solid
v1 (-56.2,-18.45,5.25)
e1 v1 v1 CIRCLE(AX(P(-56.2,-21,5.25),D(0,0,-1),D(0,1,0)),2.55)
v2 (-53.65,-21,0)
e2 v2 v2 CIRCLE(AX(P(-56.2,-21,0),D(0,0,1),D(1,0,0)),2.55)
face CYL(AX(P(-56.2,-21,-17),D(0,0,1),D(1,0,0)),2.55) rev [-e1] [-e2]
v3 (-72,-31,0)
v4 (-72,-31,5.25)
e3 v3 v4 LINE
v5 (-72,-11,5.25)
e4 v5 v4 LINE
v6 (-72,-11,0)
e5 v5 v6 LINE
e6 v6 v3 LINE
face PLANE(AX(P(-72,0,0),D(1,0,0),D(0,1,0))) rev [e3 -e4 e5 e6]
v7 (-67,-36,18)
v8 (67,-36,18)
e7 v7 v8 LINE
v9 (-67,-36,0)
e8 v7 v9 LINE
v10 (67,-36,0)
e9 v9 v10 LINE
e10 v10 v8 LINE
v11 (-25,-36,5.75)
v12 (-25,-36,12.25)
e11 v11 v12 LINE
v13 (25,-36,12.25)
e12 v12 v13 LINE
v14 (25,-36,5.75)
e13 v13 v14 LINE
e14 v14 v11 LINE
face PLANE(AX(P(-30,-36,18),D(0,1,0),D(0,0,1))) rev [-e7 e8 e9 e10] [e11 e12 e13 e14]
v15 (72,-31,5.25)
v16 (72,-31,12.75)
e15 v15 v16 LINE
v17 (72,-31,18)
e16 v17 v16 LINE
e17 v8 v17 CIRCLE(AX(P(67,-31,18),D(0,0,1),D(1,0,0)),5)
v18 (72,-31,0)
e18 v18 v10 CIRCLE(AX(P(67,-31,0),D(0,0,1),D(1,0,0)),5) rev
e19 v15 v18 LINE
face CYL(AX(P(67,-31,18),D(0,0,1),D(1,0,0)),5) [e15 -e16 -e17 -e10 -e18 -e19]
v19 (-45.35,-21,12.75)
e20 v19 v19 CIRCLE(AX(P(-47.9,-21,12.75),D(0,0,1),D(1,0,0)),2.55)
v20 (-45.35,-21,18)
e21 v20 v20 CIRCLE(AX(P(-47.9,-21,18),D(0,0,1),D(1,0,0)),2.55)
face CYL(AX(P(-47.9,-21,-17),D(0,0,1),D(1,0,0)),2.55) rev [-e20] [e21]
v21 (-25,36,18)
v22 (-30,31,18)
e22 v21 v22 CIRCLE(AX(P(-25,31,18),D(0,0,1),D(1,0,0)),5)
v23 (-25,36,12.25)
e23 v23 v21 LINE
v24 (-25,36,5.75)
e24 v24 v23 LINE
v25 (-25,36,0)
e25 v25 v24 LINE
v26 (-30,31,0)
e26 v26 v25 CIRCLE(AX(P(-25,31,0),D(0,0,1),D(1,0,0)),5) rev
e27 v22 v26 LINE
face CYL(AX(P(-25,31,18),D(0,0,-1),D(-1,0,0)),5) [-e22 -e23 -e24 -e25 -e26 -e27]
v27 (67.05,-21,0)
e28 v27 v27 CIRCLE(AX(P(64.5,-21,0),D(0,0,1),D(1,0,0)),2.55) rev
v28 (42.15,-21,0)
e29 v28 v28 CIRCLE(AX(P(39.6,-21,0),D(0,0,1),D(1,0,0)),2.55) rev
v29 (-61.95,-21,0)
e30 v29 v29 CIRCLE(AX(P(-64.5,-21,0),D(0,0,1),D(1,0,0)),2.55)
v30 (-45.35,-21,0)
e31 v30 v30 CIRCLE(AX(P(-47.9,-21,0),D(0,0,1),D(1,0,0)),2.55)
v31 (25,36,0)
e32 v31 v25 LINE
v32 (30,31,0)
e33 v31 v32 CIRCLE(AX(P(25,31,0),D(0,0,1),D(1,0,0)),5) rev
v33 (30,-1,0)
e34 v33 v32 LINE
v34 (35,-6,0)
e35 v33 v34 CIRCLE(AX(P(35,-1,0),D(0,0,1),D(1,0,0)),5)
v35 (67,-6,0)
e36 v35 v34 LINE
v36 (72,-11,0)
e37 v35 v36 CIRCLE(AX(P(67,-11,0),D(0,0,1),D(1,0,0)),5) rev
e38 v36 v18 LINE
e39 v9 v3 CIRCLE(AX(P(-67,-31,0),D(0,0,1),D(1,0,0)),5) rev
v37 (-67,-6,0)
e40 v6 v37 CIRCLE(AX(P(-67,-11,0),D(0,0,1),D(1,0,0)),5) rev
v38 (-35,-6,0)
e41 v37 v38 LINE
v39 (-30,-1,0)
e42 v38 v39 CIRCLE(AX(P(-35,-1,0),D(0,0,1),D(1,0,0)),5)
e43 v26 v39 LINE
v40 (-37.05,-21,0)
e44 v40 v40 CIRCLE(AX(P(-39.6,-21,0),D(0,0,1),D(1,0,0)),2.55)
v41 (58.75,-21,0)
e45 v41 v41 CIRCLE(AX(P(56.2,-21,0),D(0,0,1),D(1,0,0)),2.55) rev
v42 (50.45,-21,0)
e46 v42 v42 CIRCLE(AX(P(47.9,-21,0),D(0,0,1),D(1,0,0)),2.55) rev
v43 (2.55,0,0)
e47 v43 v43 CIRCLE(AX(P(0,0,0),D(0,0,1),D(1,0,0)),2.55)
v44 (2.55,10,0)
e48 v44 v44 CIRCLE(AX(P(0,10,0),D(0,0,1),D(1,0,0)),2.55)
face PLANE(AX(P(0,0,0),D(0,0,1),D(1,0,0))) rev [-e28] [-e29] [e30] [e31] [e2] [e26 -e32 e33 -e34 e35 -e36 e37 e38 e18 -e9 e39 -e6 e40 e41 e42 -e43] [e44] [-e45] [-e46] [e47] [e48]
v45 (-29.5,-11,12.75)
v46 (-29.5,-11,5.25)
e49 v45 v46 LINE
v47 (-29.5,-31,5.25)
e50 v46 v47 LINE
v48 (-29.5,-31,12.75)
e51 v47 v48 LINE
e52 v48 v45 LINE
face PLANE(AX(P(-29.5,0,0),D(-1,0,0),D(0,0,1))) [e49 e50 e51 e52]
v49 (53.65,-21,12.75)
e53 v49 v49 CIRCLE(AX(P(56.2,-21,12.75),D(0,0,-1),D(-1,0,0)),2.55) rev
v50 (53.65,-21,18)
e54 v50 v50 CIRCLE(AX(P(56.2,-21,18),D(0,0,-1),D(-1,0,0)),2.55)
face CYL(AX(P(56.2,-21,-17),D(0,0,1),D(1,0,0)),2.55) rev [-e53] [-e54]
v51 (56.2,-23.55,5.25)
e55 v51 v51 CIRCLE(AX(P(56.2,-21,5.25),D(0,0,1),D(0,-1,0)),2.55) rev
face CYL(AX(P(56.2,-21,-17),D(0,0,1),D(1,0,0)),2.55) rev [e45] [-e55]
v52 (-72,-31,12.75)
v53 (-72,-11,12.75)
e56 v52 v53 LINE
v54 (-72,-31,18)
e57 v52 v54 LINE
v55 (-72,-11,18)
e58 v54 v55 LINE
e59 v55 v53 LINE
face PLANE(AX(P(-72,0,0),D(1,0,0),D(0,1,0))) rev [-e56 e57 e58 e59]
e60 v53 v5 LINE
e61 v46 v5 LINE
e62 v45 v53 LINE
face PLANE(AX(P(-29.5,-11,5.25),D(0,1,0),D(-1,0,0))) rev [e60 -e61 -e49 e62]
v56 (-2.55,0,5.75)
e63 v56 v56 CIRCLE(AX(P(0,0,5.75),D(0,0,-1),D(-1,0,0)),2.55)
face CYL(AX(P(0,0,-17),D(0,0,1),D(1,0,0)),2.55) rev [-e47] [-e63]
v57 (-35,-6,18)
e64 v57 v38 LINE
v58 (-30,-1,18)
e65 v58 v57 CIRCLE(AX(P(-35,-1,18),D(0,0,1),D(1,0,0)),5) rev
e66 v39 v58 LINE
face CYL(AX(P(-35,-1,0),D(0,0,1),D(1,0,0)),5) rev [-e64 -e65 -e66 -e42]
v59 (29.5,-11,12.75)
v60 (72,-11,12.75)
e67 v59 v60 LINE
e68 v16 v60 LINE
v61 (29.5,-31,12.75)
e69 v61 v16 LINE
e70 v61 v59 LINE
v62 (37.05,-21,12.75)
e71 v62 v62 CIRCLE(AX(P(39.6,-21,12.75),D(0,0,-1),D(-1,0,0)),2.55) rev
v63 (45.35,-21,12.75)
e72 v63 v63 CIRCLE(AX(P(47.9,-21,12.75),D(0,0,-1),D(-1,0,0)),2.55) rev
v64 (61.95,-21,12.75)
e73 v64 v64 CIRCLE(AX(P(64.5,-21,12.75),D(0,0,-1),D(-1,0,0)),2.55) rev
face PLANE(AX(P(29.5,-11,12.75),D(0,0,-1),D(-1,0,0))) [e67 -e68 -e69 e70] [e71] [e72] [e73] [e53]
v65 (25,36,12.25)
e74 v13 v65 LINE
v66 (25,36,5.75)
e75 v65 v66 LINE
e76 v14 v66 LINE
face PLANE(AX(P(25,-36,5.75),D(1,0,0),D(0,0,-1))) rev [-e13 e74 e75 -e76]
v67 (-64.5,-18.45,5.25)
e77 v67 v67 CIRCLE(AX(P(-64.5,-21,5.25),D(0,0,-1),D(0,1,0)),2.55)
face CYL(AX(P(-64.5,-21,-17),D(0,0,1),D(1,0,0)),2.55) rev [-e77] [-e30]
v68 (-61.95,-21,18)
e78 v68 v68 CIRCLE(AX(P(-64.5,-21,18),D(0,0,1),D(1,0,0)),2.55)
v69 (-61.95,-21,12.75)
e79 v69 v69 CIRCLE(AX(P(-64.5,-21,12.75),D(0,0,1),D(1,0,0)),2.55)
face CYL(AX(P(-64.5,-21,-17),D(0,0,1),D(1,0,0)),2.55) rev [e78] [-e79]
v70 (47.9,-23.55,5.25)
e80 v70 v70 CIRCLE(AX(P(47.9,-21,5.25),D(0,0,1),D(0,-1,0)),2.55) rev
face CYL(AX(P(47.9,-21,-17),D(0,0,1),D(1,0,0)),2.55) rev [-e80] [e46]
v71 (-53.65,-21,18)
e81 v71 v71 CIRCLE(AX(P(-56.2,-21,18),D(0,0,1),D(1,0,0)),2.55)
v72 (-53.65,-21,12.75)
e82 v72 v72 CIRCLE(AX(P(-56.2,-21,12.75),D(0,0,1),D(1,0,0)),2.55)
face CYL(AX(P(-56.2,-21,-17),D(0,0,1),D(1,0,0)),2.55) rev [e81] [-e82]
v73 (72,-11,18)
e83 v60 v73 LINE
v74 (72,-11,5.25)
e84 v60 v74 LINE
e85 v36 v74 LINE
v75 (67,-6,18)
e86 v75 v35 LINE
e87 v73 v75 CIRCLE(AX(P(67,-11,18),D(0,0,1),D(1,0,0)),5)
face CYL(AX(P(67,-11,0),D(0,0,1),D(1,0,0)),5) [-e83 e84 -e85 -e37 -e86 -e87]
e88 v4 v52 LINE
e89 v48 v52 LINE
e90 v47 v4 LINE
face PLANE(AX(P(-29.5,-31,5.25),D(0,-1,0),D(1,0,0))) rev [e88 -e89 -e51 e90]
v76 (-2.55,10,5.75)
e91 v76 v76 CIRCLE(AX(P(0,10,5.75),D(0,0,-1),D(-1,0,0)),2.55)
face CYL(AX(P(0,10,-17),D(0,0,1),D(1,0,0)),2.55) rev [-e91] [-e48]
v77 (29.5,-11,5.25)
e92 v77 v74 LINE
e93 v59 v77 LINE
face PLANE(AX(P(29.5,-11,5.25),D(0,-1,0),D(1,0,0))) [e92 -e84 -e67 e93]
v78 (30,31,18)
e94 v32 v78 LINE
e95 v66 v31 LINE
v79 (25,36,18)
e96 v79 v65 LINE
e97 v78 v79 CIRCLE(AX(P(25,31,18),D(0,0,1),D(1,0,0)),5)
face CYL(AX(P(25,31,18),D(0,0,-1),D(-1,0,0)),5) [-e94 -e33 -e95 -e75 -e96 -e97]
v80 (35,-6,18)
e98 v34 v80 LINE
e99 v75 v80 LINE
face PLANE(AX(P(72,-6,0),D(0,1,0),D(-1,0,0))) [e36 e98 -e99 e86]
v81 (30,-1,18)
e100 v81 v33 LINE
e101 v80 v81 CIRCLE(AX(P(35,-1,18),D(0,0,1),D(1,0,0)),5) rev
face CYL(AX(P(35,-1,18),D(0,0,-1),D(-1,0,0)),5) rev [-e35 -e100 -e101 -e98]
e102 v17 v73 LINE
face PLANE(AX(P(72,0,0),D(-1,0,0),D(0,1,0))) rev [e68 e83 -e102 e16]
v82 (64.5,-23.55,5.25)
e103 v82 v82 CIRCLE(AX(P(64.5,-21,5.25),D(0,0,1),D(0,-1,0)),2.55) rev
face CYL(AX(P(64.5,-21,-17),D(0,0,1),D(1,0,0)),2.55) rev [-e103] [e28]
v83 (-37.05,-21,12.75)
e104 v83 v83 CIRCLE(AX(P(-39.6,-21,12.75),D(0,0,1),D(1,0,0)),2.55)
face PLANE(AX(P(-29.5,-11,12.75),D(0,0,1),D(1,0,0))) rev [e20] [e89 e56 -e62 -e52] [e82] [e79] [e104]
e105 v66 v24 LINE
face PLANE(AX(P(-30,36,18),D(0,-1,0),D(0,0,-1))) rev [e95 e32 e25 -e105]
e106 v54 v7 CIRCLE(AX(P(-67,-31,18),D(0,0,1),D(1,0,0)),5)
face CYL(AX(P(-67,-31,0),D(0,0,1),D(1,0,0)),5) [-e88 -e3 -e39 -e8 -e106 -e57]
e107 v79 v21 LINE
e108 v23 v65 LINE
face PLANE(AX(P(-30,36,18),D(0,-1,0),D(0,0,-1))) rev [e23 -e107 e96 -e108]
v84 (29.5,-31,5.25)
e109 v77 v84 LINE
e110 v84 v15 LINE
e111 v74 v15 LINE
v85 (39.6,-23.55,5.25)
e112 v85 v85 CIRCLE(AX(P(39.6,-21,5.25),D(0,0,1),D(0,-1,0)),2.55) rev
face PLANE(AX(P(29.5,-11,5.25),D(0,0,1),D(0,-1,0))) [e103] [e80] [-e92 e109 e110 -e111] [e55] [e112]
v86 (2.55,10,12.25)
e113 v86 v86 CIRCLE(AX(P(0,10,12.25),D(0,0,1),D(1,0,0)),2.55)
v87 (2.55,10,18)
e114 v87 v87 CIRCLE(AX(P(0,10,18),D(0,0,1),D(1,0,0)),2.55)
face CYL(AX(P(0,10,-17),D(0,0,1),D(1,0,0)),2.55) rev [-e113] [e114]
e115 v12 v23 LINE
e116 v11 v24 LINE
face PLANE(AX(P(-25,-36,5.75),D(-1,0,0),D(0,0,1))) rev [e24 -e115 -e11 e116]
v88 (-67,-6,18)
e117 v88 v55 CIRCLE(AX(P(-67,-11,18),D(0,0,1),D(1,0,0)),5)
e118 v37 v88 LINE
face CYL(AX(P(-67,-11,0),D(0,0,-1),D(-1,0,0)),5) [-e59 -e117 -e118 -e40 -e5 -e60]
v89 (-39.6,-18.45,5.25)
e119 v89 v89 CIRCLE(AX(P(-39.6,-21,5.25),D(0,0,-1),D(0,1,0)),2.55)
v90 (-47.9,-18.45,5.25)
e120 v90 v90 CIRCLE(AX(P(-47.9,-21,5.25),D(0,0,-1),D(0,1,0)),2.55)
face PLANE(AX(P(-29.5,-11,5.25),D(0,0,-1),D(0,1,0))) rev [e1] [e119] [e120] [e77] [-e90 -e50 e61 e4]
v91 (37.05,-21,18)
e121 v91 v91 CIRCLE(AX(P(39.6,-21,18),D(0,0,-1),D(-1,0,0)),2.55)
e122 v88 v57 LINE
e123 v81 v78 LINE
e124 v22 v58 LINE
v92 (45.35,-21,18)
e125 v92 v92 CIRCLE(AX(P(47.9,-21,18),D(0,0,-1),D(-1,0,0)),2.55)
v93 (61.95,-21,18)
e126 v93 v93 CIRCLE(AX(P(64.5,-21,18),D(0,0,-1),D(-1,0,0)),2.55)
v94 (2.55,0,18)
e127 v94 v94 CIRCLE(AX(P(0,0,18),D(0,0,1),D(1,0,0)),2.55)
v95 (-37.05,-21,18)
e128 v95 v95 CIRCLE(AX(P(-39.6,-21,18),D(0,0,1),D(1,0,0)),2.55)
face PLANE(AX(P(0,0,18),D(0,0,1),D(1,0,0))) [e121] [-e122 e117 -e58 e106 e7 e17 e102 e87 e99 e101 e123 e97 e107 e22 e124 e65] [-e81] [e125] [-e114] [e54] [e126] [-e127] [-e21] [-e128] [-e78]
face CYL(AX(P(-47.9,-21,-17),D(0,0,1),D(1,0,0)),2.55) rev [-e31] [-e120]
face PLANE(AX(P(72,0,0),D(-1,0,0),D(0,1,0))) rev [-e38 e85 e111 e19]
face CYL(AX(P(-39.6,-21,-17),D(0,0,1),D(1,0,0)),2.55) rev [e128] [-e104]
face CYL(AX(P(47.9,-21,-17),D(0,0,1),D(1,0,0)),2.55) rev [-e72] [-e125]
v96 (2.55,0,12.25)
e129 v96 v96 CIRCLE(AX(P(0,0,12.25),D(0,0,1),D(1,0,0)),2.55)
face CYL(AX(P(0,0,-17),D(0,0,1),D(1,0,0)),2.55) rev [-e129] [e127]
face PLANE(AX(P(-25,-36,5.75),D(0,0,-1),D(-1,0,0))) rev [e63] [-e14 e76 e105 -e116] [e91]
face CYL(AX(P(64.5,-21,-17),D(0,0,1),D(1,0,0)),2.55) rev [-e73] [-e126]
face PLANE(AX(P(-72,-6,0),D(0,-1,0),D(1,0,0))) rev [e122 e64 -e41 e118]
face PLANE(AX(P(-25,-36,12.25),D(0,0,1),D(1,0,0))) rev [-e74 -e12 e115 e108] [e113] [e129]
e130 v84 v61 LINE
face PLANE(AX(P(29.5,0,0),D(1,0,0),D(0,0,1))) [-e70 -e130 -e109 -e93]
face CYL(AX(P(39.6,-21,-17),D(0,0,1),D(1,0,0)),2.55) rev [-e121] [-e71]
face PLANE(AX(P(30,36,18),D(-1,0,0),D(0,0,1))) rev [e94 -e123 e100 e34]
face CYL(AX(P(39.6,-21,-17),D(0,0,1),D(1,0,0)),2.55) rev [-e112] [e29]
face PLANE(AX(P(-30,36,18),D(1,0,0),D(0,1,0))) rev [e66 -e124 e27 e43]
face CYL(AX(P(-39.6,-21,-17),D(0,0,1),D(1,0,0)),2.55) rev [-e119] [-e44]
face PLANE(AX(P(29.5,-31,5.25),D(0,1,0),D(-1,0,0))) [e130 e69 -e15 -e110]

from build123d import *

# Parameters (mm, degrees)
SKETCH1_W           = 60
SKETCH1_H           = 72
BOSS_EXTRUDE1_DEPTH = 18
SKETCH2_W           = 50
SKETCH2_H           = 6.5
CUT_EXTRUDE1_DEPTH  = 81.049984385
SKETCH3_W           = 18
SKETCH3_H           = 30
BOSS_EXTRUDE2_DEPTH = 42
SKETCH4_W           = 7.5
SKETCH4_H           = 20
CUT_EXTRUDE2_DEPTH  = 42.5
SKETCH5_R           = 2.55
CUT_EXTRUDE3_DEPTH  = 35
FILLET1_R           = 5
SKETCH6_R           = 2.55
CUT_EXTRUDE4_DEPTH  = 35


with BuildPart() as part:
    # Sketch1 → Boss-Extrude1 (new body)
    with BuildSketch(Plane.XY):
        Rectangle(SKETCH1_W, SKETCH1_H)
    extrude(amount=BOSS_EXTRUDE1_DEPTH)

    # Sketch2 → Cut-Extrude1 (cut, through all)
    with BuildSketch(Plane(origin=(0, 36, 0), x_dir=(1, 0, 0), z_dir=(0, 1, 0))):
        with Locations((0, -9)):
            Rectangle(SKETCH2_W, SKETCH2_H)
    extrude(amount=-CUT_EXTRUDE1_DEPTH, mode=Mode.SUBTRACT)

    # Sketch3 → Boss-Extrude2 (add)
    with BuildSketch(Plane.ZY.offset(30)):
        with Locations((9, -21)):
            Rectangle(SKETCH3_W, SKETCH3_H)
    boss_extrude2 = extrude(amount=BOSS_EXTRUDE2_DEPTH)

    # Sketch4 → Cut-Extrude2 (cut)
    with BuildSketch(Plane.ZY.offset(72)):
        with Locations((9, -21)):
            Rectangle(SKETCH4_W, SKETCH4_H)
    cut_extrude2 = extrude(amount=-CUT_EXTRUDE2_DEPTH, mode=Mode.SUBTRACT)

    # Sketch5 → Cut-Extrude3 (cut)
    with BuildSketch(Plane.XY.offset(18)):
        with Locations((-64.5, -21)):
            Circle(SKETCH5_R)
        with Locations((-56.2, -21)):
            Circle(SKETCH5_R)
        with Locations((-47.9, -21)):
            Circle(SKETCH5_R)
        with Locations((-39.6, -21)):
            Circle(SKETCH5_R)
    cut_extrude3 = extrude(amount=-CUT_EXTRUDE3_DEPTH, mode=Mode.SUBTRACT)

    # Mirror1: Boss-Extrude2, Cut-Extrude2, Cut-Extrude3 across plane
    add(boss_extrude2.mirror(Plane(origin=(0, 0, 0), x_dir=(0, 0, 1), z_dir=(1, 0, 0))))
    add(cut_extrude2.mirror(Plane(origin=(0, 0, 0), x_dir=(0, 0, 1), z_dir=(1, 0, 0))), mode=Mode.SUBTRACT)
    add(cut_extrude3.mirror(Plane(origin=(0, 0, 0), x_dir=(0, 0, 1), z_dir=(1, 0, 0))), mode=Mode.SUBTRACT)

    # Fillet1
    fillet1_edges = [part.edges().sort_by_distance(p)[0] for p in [
        (-30, -6, 9),
        (-72, -36, 9),
        (-72, -6, 9),
        (-30, 36, 9),
        (30, 36, 9),
        (72, -6, 9),
        (72, -36, 9),
        (30, -6, 9),
    ]]
    fillet(fillet1_edges, radius=FILLET1_R - 0.0001)  # a hair under: the kernel refuses the full size

    # Sketch6 → Cut-Extrude4 (cut)
    with BuildSketch(Plane.XY.offset(18)):
        Circle(SKETCH6_R)
        with Locations((0, 10)):
            Circle(SKETCH6_R)
    extrude(amount=-CUT_EXTRUDE4_DEPTH, mode=Mode.SUBTRACT)


solid = part.part
